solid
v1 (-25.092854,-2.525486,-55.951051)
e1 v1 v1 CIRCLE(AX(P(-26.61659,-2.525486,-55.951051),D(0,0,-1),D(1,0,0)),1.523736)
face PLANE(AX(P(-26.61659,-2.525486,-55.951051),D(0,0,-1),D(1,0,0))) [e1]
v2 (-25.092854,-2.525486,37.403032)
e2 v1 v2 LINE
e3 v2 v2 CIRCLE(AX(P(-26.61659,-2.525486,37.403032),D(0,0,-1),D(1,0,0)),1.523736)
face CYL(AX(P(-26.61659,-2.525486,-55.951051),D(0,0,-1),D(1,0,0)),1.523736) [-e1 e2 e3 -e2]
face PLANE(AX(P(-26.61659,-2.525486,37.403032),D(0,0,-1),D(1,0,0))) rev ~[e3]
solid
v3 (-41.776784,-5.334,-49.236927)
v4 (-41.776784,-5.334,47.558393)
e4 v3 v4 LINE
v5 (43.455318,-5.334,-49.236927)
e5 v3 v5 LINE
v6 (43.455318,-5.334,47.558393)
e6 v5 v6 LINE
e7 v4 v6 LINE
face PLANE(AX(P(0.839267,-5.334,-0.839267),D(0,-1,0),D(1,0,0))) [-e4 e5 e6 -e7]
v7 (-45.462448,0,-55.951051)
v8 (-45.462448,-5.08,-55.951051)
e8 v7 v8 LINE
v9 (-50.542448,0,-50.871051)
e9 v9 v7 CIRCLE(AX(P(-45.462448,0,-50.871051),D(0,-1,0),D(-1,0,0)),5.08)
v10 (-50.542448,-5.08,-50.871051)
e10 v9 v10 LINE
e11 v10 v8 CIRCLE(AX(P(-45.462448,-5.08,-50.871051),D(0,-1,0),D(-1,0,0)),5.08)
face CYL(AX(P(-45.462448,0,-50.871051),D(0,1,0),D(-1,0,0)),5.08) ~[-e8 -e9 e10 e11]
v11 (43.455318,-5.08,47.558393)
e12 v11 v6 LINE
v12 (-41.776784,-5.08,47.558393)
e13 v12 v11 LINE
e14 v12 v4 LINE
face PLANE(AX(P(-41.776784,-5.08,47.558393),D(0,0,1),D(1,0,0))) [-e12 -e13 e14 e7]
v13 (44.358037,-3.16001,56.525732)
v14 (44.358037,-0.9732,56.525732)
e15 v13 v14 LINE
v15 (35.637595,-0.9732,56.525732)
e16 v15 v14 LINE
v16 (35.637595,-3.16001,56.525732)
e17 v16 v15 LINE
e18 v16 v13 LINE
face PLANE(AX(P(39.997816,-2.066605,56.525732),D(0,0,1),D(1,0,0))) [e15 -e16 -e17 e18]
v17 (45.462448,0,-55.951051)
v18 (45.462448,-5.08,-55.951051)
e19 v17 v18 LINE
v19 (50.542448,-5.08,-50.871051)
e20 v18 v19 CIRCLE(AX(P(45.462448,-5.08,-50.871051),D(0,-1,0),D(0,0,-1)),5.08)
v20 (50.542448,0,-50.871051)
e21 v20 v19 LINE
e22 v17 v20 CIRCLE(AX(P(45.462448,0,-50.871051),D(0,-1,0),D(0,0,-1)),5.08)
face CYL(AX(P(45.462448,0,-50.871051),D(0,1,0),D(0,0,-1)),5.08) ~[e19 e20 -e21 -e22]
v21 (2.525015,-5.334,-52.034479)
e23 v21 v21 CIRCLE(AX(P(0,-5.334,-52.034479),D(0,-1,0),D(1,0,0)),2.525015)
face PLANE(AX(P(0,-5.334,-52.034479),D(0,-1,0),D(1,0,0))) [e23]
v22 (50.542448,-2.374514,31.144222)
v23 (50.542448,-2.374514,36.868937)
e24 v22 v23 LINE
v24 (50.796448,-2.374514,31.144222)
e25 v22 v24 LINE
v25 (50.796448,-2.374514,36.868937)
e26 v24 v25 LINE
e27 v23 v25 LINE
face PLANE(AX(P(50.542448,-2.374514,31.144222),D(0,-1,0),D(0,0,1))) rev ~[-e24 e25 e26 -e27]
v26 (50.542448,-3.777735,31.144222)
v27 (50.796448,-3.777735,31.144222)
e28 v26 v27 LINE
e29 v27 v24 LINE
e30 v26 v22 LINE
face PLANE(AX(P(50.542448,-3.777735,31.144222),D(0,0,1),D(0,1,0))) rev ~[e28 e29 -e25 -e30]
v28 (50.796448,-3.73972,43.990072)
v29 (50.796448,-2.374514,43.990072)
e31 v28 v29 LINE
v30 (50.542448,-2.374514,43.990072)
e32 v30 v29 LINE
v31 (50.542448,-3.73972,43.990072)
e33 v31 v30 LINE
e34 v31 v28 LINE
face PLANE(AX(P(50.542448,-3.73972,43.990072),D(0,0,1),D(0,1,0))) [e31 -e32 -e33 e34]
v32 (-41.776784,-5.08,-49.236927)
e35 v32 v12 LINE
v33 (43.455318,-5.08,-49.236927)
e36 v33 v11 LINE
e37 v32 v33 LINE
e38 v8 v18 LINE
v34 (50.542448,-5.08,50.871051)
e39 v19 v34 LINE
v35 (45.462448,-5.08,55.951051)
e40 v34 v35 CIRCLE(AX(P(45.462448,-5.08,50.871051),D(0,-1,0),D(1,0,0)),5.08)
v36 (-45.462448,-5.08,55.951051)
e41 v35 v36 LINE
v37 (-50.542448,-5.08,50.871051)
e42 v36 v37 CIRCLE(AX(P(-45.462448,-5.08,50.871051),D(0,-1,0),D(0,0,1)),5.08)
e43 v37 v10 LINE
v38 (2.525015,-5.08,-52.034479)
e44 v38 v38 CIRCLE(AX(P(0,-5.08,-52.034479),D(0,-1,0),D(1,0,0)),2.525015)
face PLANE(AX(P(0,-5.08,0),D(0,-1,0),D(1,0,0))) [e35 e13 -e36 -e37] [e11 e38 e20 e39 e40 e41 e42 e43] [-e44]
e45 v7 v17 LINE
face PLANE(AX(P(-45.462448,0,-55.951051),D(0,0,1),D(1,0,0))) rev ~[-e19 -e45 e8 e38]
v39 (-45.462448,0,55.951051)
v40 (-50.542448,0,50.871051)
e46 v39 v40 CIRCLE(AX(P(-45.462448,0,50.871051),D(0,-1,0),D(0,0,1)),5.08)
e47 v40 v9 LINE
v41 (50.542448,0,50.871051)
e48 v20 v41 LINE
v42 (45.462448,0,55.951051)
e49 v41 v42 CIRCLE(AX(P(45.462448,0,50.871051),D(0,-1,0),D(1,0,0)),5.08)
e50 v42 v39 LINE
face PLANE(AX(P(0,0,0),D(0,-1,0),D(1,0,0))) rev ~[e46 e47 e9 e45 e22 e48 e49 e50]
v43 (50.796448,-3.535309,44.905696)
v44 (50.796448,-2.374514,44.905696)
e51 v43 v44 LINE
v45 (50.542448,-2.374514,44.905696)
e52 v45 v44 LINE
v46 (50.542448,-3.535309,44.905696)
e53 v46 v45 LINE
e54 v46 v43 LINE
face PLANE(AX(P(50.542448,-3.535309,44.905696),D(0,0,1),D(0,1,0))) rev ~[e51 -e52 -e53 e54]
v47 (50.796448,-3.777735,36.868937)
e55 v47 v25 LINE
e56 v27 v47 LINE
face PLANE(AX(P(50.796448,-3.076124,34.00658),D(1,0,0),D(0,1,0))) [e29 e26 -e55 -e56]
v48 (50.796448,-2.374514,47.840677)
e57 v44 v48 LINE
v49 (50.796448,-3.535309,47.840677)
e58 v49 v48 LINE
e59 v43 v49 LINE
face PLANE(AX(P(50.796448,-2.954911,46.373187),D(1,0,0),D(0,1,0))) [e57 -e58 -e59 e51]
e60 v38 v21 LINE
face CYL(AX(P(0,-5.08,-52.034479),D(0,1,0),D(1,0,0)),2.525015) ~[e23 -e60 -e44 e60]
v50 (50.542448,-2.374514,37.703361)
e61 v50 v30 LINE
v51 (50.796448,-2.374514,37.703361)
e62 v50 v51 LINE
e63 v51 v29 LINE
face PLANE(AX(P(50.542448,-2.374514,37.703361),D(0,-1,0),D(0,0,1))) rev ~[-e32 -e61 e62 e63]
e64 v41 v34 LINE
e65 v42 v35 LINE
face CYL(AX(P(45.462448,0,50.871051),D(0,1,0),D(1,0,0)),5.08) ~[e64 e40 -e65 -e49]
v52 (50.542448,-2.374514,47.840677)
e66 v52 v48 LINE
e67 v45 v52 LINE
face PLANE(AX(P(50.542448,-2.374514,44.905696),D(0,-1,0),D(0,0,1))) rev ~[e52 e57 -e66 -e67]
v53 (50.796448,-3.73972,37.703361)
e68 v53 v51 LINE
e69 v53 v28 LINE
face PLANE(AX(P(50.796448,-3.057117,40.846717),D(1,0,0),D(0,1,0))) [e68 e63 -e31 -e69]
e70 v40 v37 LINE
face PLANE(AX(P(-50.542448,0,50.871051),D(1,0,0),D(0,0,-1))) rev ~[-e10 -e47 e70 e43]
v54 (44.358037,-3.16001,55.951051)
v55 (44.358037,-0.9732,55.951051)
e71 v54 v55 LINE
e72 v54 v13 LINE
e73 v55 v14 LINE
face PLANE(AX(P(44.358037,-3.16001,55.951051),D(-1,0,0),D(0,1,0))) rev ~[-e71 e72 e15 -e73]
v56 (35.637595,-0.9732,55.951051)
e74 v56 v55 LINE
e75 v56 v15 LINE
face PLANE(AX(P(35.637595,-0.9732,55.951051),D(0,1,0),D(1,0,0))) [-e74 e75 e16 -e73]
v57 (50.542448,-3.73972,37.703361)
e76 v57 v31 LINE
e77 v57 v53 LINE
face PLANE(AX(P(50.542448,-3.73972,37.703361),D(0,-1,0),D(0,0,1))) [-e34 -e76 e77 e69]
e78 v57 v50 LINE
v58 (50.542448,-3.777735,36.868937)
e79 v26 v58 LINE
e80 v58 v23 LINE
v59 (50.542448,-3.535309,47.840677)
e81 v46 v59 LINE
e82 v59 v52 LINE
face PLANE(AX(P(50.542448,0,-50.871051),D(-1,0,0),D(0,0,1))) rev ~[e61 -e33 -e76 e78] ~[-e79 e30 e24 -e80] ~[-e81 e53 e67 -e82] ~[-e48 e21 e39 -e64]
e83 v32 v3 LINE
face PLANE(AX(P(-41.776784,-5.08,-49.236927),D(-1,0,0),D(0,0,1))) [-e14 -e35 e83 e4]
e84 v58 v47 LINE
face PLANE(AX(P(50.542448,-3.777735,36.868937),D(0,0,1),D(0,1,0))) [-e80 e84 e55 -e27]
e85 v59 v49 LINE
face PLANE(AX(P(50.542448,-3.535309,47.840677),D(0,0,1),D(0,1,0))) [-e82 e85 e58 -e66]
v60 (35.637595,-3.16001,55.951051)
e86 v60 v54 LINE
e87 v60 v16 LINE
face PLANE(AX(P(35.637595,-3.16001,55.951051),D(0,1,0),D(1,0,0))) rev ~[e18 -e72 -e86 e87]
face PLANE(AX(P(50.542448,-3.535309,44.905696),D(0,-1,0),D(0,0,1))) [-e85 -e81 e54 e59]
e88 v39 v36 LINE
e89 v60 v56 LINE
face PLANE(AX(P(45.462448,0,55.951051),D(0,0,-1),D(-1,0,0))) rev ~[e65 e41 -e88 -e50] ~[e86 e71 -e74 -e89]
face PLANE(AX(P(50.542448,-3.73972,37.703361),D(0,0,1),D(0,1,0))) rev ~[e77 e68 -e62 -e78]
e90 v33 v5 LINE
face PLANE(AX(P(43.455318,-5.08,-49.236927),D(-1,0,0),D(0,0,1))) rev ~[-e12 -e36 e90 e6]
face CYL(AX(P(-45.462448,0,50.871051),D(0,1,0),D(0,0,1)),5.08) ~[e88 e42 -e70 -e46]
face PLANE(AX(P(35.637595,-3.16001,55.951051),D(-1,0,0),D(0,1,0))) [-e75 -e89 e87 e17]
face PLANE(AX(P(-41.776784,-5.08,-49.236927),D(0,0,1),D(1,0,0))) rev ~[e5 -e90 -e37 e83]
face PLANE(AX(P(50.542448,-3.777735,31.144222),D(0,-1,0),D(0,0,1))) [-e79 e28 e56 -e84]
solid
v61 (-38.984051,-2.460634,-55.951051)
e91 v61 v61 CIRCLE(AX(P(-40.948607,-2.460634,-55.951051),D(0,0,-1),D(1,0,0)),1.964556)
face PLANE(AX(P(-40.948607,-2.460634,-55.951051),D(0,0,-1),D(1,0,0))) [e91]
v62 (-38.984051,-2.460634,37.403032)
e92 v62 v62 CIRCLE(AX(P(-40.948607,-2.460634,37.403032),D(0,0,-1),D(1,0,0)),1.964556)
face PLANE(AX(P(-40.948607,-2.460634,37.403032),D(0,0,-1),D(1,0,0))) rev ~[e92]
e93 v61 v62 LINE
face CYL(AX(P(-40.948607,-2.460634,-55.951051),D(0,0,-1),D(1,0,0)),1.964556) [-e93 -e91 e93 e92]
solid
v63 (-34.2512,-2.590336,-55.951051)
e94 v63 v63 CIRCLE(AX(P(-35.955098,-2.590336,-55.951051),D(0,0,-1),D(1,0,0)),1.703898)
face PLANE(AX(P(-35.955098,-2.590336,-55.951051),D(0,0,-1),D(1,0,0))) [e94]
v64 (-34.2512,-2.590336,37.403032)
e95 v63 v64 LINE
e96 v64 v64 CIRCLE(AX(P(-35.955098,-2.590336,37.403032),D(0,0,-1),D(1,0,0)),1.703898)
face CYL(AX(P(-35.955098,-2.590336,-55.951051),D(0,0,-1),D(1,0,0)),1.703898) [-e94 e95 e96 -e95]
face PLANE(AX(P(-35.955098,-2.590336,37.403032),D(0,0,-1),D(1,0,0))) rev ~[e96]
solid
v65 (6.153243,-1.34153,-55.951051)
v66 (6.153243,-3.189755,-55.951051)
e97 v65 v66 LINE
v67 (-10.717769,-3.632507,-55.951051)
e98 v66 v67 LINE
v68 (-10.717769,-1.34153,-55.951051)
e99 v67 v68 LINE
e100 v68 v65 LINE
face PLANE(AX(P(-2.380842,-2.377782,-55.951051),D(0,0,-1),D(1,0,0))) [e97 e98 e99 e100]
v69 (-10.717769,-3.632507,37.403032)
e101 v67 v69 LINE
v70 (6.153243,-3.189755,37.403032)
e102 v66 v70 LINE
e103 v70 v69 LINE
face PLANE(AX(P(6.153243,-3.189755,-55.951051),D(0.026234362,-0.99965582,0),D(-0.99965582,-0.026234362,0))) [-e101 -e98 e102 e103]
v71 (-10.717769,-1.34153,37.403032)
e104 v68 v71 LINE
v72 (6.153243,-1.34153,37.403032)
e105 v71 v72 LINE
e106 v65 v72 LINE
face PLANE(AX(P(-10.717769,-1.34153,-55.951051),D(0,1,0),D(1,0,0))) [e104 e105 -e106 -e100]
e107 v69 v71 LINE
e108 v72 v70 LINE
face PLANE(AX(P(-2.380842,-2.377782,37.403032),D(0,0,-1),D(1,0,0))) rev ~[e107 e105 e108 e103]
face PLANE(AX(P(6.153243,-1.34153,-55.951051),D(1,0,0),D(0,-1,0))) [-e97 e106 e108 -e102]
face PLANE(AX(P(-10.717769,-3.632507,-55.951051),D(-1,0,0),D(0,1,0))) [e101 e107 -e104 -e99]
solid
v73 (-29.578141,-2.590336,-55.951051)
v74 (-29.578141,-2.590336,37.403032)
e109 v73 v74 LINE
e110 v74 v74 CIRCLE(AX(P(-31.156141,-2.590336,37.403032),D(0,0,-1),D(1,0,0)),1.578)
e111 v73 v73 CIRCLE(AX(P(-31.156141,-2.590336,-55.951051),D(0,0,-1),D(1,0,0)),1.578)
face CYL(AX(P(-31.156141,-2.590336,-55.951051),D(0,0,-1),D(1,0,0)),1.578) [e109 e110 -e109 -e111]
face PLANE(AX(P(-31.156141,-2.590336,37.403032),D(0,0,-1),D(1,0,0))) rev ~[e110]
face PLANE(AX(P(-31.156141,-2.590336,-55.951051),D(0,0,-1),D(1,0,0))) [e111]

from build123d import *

# Parameters (mm, degrees)
F0_R      = 2.737762288
F0_R_2    = 1.0985637782
F1_DEPTH  = 5.08
F2_W      = 85.2321013808
F2_H      = 96.7953205109
F3_DEPTH  = 0.254
F6_DEPTH  = 93.3540835977
F5_R      = 1.9645563542
F5_R_2    = 1.7038978903
F5_R_3    = 1.5780003366
F5_R_4    = 1.5237356412
F7_W      = 8.7204426527
F7_H      = 2.1868101903
F8_DEPTH  = 0.5746809766
F9_R      = 2.5250145547
F10_DEPTH = 0.254
F11_W     = 1.3652069028
F11_H     = 6.2867105007
F11_W_2   = 1.403221162
F11_H_2   = 5.7247150689
F11_W_3   = 1.1607955676
F11_H_3   = 2.9349811375
F12_DEPTH = 0.254


# Not quite as in the source:
# - a feature names something its author has since deleted; it is built from what else it names


with BuildPart() as f1:
    # F0 (on Front) → F1 (new body)
    with BuildSketch(Plane.XZ):
        with BuildLine():
            Line((45.462447716, 55.951051414), (-45.462447716, 55.951051414))
            ThreePointArc((-45.462447716, 55.951051414), (-49.0545501644, 54.4631538624), (-50.542447716, 50.871051414))
            Line((-50.542447716, 50.871051414), (-50.542447716, -50.871051414))
            ThreePointArc((-50.542447716, -50.871051414), (-49.0545501644, -54.4631538624), (-45.462447716, -55.951051414))
            Line((-45.462447716, -55.951051414), (45.462447716, -55.951051414))
            ThreePointArc((45.462447716, -55.951051414), (49.0545501644, -54.4631538624), (50.542447716, -50.871051414))
            Line((50.542447716, -50.871051414), (50.542447716, 50.871051414))
            ThreePointArc((50.542447716, 50.871051414), (49.0545501644, 54.4631538624), (45.462447716, 55.951051414))
        make_face()
        with Locations((0, -50.8815050125)):
            Circle(F0_R, mode=Mode.SUBTRACT)
        with Locations((0, 50.8815050125)):
            Circle(F0_R_2, mode=Mode.SUBTRACT)
        with Locations((0, -50.8815050125)):
            Circle(F0_R)
        with Locations((0, 50.8815050125)):
            Circle(F0_R_2)
    extrude(amount=F1_DEPTH)

    # F2 (on face) → F3 (join)
    with BuildSketch(Plane.XZ.offset(5.08)):
        with Locations((0.8392669261, -0.8392669261)):
            Rectangle(F2_W, F2_H)
    extrude(amount=F3_DEPTH)

    # F7 (on face) → F8 (join)
    with BuildSketch(Plane.XY.offset(55.951051414)):
        with Locations((39.9978160858, -2.066604764)):
            Rectangle(F7_W, F7_H)
    extrude(amount=F8_DEPTH)

    # F9 (on face) → F10 (join)
    with BuildSketch(Plane.XZ.offset(5.08)):
        with Locations((0, -52.0344786346)):
            Circle(F9_R)
    extrude(amount=F10_DEPTH)

    # F11 (on face) → F12 (join)
    with BuildSketch(Plane.YZ.offset(50.542447716)):
        with Locations((-3.0571169918, 40.8467166126)):
            Rectangle(F11_W, F11_H)
        with Locations((-3.0761241214, 34.0065797791)):
            Rectangle(F11_W_2, F11_H_2)
        with Locations((-2.9549113242, 46.373186633)):
            Rectangle(F11_W_3, F11_H_3)
    extrude(amount=F12_DEPTH)


with BuildPart() as f6:
    # F4 (on face) → F6 (new body)
    with BuildSketch(Plane(origin=(0, 0, -55.951051414), x_dir=(1, 0, 0), z_dir=(0, 0, -1))):
        Polygon((6.1532426625, 3.1897546723), (-10.7177691534, 3.632507287), (-10.7177691534, 1.3415296562), (6.1532426625, 1.3415296562), align=None)
    extrude(amount=-F6_DEPTH)


with BuildPart() as f6b:
    # F5 (on face) → F6, piece 2 (new body)
    with BuildSketch(Plane(origin=(0, 0, -55.951051414), x_dir=(1, 0, 0), z_dir=(0, 0, -1))):
        with Locations((-40.9486070275, 2.4606343359)):
            Circle(F5_R)
    extrude(amount=-F6_DEPTH)


with BuildPart() as f6c:
    # F5 (on face) → F6, piece 3 (new body)
    with BuildSketch(Plane(origin=(0, 0, -55.951051414), x_dir=(1, 0, 0), z_dir=(0, 0, -1))):
        with Locations((-35.9550975263, 2.5903359056)):
            Circle(F5_R_2)
    extrude(amount=-F6_DEPTH)


with BuildPart() as f6d:
    # F5 (on face) → F6, piece 4 (new body)
    with BuildSketch(Plane(origin=(0, 0, -55.951051414), x_dir=(1, 0, 0), z_dir=(0, 0, -1))):
        with Locations((-31.1561413109, 2.5903359056)):
            Circle(F5_R_3)
    extrude(amount=-F6_DEPTH)


with BuildPart() as f6e:
    # F5 (on face) → F6, piece 5 (new body)
    with BuildSketch(Plane(origin=(0, 0, -55.951051414), x_dir=(1, 0, 0), z_dir=(0, 0, -1))):
        with Locations((-26.6165900975, 2.525486052)):
            Circle(F5_R_4)
    extrude(amount=-F6_DEPTH)


solid = Compound([f1.part, f6.part, f6b.part, f6c.part, f6d.part, f6e.part])
